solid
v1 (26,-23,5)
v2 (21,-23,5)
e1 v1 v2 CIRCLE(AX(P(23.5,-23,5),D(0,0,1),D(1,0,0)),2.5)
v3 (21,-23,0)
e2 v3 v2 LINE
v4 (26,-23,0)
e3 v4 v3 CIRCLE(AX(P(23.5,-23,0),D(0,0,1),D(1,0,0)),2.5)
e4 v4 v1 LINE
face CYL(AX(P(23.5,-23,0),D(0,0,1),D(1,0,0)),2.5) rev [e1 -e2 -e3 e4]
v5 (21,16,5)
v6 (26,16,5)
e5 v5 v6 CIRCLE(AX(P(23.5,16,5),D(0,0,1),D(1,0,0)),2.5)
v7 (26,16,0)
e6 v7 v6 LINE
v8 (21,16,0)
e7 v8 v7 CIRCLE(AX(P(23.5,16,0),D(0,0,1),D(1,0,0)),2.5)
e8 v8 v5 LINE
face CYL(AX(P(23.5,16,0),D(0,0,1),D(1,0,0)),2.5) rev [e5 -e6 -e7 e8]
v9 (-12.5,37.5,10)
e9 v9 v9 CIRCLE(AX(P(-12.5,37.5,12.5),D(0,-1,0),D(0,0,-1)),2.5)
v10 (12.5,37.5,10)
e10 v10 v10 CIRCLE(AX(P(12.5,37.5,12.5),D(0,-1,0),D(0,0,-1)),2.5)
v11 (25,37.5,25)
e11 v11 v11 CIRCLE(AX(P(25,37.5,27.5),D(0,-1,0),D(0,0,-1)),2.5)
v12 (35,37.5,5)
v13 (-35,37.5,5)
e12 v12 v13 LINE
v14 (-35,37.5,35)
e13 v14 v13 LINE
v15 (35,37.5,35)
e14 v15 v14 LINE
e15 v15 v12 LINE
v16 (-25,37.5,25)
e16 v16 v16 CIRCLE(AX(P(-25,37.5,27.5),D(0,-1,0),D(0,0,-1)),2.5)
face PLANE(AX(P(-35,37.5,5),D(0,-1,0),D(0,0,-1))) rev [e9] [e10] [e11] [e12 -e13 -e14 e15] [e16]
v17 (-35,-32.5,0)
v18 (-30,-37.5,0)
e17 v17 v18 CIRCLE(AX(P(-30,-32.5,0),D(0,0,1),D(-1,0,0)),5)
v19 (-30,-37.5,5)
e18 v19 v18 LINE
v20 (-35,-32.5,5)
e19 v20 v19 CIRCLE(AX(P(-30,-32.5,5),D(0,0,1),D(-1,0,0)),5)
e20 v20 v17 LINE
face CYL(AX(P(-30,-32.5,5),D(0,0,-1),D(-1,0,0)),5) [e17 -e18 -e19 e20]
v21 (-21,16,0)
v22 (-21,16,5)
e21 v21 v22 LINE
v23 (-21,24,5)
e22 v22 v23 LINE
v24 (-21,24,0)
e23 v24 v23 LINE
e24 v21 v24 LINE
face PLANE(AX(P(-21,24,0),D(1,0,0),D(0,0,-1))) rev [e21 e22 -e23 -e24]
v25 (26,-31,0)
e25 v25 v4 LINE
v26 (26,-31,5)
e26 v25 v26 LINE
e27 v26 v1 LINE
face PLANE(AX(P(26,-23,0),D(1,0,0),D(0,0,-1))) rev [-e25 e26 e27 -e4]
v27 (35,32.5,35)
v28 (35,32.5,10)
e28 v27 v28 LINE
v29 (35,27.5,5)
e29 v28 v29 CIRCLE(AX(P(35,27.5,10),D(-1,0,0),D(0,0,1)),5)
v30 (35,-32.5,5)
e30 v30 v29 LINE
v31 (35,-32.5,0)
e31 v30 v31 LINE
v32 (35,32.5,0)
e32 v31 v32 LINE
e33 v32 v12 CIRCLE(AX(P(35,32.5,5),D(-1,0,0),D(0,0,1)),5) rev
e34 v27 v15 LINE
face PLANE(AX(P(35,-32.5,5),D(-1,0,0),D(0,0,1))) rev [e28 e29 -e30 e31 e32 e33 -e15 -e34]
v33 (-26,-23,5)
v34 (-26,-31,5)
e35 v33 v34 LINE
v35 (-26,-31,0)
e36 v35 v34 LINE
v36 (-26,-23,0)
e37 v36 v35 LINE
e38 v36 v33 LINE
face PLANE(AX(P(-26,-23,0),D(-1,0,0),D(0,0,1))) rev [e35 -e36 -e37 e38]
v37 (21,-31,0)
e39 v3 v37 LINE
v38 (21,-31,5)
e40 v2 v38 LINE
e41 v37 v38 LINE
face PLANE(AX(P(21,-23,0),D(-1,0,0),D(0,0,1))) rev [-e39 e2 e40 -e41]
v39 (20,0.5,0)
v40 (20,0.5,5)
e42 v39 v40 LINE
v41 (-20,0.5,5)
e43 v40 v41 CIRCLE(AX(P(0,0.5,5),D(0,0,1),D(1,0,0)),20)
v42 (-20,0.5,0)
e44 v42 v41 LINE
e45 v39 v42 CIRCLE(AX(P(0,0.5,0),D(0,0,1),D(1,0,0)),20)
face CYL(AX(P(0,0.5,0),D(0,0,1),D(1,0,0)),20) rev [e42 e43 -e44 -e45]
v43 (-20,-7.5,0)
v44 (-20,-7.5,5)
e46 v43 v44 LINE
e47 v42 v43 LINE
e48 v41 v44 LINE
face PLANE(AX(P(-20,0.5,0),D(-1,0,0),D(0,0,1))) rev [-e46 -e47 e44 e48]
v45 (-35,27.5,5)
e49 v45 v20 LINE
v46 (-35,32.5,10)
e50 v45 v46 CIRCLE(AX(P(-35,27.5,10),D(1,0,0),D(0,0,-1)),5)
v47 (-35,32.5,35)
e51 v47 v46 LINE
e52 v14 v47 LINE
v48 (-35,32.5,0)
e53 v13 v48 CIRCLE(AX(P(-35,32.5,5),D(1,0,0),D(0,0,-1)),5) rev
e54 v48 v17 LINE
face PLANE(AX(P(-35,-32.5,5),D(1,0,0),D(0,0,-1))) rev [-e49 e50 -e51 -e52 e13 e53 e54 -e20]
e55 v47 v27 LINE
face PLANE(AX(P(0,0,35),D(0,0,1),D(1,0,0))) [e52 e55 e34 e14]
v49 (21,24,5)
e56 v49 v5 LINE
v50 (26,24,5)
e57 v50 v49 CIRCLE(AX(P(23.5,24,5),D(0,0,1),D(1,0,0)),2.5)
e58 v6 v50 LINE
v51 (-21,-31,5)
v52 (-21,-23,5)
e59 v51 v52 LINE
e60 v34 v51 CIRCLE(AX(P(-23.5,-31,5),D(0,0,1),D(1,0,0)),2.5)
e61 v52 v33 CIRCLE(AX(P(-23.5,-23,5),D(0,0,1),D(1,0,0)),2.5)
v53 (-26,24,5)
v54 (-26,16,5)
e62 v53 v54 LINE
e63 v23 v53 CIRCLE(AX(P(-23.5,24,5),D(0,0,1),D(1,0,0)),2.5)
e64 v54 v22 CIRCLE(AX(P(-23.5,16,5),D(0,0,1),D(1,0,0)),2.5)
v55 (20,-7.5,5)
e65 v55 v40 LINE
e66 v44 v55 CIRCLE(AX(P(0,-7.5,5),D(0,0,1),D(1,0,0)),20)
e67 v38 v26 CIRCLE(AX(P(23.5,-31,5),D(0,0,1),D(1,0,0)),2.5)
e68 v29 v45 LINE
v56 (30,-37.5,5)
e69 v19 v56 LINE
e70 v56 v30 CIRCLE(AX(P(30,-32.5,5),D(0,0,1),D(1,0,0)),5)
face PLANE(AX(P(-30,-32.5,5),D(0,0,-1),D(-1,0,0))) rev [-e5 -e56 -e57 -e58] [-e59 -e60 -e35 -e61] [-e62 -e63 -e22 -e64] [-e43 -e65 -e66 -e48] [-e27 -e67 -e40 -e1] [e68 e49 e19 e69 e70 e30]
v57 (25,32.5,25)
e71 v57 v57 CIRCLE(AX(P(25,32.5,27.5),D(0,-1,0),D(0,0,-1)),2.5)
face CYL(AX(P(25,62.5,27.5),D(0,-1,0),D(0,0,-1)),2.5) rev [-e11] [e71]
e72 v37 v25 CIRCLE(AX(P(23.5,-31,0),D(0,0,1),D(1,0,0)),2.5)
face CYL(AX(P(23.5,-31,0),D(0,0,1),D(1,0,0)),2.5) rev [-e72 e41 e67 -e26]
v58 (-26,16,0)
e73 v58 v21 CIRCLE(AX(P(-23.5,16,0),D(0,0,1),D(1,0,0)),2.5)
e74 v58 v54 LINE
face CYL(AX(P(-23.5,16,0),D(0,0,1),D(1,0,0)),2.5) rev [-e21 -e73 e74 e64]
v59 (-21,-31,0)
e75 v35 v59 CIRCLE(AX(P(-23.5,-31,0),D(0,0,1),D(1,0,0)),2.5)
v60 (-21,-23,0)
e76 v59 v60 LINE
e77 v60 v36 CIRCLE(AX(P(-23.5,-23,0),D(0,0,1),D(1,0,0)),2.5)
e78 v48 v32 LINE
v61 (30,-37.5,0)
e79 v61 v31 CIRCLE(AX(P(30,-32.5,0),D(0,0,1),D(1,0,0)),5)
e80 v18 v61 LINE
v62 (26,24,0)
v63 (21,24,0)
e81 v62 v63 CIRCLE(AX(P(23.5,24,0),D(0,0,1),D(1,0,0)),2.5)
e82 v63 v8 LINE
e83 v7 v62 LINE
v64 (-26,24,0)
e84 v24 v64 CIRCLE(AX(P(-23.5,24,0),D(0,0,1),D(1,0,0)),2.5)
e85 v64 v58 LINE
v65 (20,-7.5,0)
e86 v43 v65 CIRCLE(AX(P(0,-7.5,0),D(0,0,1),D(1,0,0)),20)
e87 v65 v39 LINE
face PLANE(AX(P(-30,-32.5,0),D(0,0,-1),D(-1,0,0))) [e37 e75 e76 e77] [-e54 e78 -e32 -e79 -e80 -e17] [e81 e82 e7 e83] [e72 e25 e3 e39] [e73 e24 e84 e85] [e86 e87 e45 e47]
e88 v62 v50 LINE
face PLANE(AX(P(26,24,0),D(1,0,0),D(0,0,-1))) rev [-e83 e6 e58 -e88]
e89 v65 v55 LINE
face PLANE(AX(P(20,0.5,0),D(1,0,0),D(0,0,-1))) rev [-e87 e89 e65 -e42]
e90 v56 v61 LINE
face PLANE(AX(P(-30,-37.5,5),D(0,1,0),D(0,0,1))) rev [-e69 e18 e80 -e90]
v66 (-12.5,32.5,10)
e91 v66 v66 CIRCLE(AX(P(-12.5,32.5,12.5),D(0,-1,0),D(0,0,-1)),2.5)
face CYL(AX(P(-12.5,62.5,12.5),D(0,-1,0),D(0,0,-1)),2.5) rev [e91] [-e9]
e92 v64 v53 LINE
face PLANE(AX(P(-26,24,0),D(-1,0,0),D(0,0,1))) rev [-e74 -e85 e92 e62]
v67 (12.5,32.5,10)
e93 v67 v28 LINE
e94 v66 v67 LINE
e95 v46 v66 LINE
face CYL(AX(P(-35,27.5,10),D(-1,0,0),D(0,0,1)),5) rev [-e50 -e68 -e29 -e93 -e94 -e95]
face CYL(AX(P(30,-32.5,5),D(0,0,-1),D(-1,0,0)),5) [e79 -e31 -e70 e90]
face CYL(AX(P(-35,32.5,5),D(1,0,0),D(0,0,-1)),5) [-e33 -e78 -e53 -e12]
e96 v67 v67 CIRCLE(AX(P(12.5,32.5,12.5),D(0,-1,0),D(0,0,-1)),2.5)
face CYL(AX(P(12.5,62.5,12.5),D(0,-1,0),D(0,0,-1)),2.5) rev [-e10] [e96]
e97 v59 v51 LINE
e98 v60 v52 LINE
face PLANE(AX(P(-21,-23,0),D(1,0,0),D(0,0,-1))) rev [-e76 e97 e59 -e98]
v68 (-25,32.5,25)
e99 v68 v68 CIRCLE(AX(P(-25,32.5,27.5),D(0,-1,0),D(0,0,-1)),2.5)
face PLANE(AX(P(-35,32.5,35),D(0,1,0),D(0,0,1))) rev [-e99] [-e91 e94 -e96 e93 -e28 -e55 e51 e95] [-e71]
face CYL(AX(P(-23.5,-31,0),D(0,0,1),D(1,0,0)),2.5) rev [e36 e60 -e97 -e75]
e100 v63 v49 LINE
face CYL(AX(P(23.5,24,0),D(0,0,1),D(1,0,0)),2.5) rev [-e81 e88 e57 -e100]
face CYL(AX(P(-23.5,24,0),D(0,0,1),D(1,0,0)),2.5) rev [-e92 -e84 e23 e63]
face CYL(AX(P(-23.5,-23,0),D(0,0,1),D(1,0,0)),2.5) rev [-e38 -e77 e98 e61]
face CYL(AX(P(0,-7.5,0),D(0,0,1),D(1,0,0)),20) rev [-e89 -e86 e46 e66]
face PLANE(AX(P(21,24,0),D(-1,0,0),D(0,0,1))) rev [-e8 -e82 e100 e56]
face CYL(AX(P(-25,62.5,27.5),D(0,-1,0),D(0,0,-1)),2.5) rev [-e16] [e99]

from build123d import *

# Parameters (mm, degrees)
BOSS_EXTRUDE1_DEPTH = 5
CUT_EXTRUDE1_DEPTH  = 52.53882032022076
BOSS_EXTRUDE2_DEPTH = 30
SKETCH5_R           = 2.4999999999999987
SKETCH5_R_2         = 2.4999999999999982
CUT_EXTRUDE2_DEPTH  = 30
FILLET1_R           = 5


with BuildPart() as part:
    # Sketch2 → Boss-Extrude1 (new body)
    with BuildSketch(Plane.XY):
        with BuildLine():
            Line((-29.999999999999975, -37.499999999999986), (30, -37.499999999999986))
            ThreePointArc((30, -37.499999999999986), (33.53553390593274, -36.03553390593272), (35, -32.499999999999986))
            Line((35, -32.499999999999986), (35, 37.5))
            Line((35, 37.5), (-34.99999999999998, 37.5))
            Line((-34.99999999999998, 37.5), (-34.99999999999998, -32.499999999999986))
            ThreePointArc((-34.99999999999998, -32.499999999999986), (-33.53553390593271, -36.03553390593272), (-29.999999999999975, -37.499999999999986))
        make_face()
    extrude(amount=BOSS_EXTRUDE1_DEPTH)

    # Sketch3 → Cut-Extrude1 (cut, through all)
    with BuildSketch(Plane.XY.offset(5)):
        with BuildLine():
            Line((-21.000000000000007, 24), (-21.000000000000007, 16))
            ThreePointArc((-21.000000000000007, 16), (-23.500000000000007, 13.500000000000018), (-25.99999999999999, 16))
            Line((-25.99999999999999, 16), (-25.99999999999999, 24))
            ThreePointArc((-25.99999999999999, 24), (-23.500000000000007, 26.5), (-21.000000000000007, 24))
        make_face()
        with BuildLine():
            Line((-20.999999999999993, -23), (-20.999999999999993, -31))
            ThreePointArc((-20.999999999999993, -31), (-23.499999999999996, -33.5), (-25.999999999999996, -31))
            Line((-25.999999999999996, -31), (-25.999999999999996, -23))
            ThreePointArc((-25.999999999999996, -23), (-23.499999999999996, -20.499999999999996), (-20.999999999999993, -23))
        make_face()
        with BuildLine():
            Line((25.999999999999993, 24), (25.999999999999993, 16))
            ThreePointArc((25.999999999999993, 16), (23.499999999999993, 13.500000000000018), (21.00000000000001, 16))
            Line((21.00000000000001, 16), (21.00000000000001, 24))
            ThreePointArc((21.00000000000001, 24), (23.499999999999993, 26.5), (25.999999999999993, 24))
        make_face()
        with BuildLine():
            Line((26.000000000000007, -23), (26.000000000000007, -31))
            ThreePointArc((26.000000000000007, -31), (23.500000000000004, -33.5), (21.000000000000004, -31))
            Line((21.000000000000004, -31), (21.000000000000004, -23))
            ThreePointArc((21.000000000000004, -23), (23.500000000000004, -20.499999999999996), (26.000000000000007, -23))
        make_face()
        with BuildLine():
            Line((20.000000000000004, 0.49999999999999784), (20.000000000000004, -7.499999999999997))
            ThreePointArc((20.000000000000004, -7.499999999999997), (1.22e-15, -27.500000000000004), (-20.000000000000004, -7.500000000000003))
            Line((-20.000000000000004, -7.500000000000003), (-20.000000000000004, 0.500000000000003))
            ThreePointArc((-20.000000000000004, 0.500000000000003), (5.67e-15, 20.500000000000004), (20.000000000000004, 0.49999999999999784))
        make_face()
    extrude(amount=-CUT_EXTRUDE1_DEPTH, mode=Mode.SUBTRACT)

    # Sketch4 → Boss-Extrude2 (add)
    with BuildSketch(Plane.XY.offset(5)):
        Polygon((-34.99999999999998, 37.5), (-34.99999999999998, 32.5), (35, 32.5), (35, 37.49999999999999), align=None)
    extrude(amount=BOSS_EXTRUDE2_DEPTH)

    # Sketch5 → Cut-Extrude2 (cut)
    with BuildSketch(Plane.XZ.offset(-32.5)):
        with Locations((-12.5, 12.5)):
            Circle(SKETCH5_R)
        with Locations((12.5, 12.5)):
            Circle(SKETCH5_R)
        with Locations((-25, 27.5)):
            Circle(SKETCH5_R_2)
        with Locations((25, 27.5)):
            Circle(SKETCH5_R_2)
    extrude(amount=-CUT_EXTRUDE2_DEPTH, mode=Mode.SUBTRACT)

    # Fillet1
    fillet1_edges = [part.edges().sort_by_distance(p)[0] for p in [
        (7.11e-15, 32.5, 5),
        (1.421e-14, 37.5, 0),
    ]]
    fillet(fillet1_edges, radius=FILLET1_R)


solid = part.part
